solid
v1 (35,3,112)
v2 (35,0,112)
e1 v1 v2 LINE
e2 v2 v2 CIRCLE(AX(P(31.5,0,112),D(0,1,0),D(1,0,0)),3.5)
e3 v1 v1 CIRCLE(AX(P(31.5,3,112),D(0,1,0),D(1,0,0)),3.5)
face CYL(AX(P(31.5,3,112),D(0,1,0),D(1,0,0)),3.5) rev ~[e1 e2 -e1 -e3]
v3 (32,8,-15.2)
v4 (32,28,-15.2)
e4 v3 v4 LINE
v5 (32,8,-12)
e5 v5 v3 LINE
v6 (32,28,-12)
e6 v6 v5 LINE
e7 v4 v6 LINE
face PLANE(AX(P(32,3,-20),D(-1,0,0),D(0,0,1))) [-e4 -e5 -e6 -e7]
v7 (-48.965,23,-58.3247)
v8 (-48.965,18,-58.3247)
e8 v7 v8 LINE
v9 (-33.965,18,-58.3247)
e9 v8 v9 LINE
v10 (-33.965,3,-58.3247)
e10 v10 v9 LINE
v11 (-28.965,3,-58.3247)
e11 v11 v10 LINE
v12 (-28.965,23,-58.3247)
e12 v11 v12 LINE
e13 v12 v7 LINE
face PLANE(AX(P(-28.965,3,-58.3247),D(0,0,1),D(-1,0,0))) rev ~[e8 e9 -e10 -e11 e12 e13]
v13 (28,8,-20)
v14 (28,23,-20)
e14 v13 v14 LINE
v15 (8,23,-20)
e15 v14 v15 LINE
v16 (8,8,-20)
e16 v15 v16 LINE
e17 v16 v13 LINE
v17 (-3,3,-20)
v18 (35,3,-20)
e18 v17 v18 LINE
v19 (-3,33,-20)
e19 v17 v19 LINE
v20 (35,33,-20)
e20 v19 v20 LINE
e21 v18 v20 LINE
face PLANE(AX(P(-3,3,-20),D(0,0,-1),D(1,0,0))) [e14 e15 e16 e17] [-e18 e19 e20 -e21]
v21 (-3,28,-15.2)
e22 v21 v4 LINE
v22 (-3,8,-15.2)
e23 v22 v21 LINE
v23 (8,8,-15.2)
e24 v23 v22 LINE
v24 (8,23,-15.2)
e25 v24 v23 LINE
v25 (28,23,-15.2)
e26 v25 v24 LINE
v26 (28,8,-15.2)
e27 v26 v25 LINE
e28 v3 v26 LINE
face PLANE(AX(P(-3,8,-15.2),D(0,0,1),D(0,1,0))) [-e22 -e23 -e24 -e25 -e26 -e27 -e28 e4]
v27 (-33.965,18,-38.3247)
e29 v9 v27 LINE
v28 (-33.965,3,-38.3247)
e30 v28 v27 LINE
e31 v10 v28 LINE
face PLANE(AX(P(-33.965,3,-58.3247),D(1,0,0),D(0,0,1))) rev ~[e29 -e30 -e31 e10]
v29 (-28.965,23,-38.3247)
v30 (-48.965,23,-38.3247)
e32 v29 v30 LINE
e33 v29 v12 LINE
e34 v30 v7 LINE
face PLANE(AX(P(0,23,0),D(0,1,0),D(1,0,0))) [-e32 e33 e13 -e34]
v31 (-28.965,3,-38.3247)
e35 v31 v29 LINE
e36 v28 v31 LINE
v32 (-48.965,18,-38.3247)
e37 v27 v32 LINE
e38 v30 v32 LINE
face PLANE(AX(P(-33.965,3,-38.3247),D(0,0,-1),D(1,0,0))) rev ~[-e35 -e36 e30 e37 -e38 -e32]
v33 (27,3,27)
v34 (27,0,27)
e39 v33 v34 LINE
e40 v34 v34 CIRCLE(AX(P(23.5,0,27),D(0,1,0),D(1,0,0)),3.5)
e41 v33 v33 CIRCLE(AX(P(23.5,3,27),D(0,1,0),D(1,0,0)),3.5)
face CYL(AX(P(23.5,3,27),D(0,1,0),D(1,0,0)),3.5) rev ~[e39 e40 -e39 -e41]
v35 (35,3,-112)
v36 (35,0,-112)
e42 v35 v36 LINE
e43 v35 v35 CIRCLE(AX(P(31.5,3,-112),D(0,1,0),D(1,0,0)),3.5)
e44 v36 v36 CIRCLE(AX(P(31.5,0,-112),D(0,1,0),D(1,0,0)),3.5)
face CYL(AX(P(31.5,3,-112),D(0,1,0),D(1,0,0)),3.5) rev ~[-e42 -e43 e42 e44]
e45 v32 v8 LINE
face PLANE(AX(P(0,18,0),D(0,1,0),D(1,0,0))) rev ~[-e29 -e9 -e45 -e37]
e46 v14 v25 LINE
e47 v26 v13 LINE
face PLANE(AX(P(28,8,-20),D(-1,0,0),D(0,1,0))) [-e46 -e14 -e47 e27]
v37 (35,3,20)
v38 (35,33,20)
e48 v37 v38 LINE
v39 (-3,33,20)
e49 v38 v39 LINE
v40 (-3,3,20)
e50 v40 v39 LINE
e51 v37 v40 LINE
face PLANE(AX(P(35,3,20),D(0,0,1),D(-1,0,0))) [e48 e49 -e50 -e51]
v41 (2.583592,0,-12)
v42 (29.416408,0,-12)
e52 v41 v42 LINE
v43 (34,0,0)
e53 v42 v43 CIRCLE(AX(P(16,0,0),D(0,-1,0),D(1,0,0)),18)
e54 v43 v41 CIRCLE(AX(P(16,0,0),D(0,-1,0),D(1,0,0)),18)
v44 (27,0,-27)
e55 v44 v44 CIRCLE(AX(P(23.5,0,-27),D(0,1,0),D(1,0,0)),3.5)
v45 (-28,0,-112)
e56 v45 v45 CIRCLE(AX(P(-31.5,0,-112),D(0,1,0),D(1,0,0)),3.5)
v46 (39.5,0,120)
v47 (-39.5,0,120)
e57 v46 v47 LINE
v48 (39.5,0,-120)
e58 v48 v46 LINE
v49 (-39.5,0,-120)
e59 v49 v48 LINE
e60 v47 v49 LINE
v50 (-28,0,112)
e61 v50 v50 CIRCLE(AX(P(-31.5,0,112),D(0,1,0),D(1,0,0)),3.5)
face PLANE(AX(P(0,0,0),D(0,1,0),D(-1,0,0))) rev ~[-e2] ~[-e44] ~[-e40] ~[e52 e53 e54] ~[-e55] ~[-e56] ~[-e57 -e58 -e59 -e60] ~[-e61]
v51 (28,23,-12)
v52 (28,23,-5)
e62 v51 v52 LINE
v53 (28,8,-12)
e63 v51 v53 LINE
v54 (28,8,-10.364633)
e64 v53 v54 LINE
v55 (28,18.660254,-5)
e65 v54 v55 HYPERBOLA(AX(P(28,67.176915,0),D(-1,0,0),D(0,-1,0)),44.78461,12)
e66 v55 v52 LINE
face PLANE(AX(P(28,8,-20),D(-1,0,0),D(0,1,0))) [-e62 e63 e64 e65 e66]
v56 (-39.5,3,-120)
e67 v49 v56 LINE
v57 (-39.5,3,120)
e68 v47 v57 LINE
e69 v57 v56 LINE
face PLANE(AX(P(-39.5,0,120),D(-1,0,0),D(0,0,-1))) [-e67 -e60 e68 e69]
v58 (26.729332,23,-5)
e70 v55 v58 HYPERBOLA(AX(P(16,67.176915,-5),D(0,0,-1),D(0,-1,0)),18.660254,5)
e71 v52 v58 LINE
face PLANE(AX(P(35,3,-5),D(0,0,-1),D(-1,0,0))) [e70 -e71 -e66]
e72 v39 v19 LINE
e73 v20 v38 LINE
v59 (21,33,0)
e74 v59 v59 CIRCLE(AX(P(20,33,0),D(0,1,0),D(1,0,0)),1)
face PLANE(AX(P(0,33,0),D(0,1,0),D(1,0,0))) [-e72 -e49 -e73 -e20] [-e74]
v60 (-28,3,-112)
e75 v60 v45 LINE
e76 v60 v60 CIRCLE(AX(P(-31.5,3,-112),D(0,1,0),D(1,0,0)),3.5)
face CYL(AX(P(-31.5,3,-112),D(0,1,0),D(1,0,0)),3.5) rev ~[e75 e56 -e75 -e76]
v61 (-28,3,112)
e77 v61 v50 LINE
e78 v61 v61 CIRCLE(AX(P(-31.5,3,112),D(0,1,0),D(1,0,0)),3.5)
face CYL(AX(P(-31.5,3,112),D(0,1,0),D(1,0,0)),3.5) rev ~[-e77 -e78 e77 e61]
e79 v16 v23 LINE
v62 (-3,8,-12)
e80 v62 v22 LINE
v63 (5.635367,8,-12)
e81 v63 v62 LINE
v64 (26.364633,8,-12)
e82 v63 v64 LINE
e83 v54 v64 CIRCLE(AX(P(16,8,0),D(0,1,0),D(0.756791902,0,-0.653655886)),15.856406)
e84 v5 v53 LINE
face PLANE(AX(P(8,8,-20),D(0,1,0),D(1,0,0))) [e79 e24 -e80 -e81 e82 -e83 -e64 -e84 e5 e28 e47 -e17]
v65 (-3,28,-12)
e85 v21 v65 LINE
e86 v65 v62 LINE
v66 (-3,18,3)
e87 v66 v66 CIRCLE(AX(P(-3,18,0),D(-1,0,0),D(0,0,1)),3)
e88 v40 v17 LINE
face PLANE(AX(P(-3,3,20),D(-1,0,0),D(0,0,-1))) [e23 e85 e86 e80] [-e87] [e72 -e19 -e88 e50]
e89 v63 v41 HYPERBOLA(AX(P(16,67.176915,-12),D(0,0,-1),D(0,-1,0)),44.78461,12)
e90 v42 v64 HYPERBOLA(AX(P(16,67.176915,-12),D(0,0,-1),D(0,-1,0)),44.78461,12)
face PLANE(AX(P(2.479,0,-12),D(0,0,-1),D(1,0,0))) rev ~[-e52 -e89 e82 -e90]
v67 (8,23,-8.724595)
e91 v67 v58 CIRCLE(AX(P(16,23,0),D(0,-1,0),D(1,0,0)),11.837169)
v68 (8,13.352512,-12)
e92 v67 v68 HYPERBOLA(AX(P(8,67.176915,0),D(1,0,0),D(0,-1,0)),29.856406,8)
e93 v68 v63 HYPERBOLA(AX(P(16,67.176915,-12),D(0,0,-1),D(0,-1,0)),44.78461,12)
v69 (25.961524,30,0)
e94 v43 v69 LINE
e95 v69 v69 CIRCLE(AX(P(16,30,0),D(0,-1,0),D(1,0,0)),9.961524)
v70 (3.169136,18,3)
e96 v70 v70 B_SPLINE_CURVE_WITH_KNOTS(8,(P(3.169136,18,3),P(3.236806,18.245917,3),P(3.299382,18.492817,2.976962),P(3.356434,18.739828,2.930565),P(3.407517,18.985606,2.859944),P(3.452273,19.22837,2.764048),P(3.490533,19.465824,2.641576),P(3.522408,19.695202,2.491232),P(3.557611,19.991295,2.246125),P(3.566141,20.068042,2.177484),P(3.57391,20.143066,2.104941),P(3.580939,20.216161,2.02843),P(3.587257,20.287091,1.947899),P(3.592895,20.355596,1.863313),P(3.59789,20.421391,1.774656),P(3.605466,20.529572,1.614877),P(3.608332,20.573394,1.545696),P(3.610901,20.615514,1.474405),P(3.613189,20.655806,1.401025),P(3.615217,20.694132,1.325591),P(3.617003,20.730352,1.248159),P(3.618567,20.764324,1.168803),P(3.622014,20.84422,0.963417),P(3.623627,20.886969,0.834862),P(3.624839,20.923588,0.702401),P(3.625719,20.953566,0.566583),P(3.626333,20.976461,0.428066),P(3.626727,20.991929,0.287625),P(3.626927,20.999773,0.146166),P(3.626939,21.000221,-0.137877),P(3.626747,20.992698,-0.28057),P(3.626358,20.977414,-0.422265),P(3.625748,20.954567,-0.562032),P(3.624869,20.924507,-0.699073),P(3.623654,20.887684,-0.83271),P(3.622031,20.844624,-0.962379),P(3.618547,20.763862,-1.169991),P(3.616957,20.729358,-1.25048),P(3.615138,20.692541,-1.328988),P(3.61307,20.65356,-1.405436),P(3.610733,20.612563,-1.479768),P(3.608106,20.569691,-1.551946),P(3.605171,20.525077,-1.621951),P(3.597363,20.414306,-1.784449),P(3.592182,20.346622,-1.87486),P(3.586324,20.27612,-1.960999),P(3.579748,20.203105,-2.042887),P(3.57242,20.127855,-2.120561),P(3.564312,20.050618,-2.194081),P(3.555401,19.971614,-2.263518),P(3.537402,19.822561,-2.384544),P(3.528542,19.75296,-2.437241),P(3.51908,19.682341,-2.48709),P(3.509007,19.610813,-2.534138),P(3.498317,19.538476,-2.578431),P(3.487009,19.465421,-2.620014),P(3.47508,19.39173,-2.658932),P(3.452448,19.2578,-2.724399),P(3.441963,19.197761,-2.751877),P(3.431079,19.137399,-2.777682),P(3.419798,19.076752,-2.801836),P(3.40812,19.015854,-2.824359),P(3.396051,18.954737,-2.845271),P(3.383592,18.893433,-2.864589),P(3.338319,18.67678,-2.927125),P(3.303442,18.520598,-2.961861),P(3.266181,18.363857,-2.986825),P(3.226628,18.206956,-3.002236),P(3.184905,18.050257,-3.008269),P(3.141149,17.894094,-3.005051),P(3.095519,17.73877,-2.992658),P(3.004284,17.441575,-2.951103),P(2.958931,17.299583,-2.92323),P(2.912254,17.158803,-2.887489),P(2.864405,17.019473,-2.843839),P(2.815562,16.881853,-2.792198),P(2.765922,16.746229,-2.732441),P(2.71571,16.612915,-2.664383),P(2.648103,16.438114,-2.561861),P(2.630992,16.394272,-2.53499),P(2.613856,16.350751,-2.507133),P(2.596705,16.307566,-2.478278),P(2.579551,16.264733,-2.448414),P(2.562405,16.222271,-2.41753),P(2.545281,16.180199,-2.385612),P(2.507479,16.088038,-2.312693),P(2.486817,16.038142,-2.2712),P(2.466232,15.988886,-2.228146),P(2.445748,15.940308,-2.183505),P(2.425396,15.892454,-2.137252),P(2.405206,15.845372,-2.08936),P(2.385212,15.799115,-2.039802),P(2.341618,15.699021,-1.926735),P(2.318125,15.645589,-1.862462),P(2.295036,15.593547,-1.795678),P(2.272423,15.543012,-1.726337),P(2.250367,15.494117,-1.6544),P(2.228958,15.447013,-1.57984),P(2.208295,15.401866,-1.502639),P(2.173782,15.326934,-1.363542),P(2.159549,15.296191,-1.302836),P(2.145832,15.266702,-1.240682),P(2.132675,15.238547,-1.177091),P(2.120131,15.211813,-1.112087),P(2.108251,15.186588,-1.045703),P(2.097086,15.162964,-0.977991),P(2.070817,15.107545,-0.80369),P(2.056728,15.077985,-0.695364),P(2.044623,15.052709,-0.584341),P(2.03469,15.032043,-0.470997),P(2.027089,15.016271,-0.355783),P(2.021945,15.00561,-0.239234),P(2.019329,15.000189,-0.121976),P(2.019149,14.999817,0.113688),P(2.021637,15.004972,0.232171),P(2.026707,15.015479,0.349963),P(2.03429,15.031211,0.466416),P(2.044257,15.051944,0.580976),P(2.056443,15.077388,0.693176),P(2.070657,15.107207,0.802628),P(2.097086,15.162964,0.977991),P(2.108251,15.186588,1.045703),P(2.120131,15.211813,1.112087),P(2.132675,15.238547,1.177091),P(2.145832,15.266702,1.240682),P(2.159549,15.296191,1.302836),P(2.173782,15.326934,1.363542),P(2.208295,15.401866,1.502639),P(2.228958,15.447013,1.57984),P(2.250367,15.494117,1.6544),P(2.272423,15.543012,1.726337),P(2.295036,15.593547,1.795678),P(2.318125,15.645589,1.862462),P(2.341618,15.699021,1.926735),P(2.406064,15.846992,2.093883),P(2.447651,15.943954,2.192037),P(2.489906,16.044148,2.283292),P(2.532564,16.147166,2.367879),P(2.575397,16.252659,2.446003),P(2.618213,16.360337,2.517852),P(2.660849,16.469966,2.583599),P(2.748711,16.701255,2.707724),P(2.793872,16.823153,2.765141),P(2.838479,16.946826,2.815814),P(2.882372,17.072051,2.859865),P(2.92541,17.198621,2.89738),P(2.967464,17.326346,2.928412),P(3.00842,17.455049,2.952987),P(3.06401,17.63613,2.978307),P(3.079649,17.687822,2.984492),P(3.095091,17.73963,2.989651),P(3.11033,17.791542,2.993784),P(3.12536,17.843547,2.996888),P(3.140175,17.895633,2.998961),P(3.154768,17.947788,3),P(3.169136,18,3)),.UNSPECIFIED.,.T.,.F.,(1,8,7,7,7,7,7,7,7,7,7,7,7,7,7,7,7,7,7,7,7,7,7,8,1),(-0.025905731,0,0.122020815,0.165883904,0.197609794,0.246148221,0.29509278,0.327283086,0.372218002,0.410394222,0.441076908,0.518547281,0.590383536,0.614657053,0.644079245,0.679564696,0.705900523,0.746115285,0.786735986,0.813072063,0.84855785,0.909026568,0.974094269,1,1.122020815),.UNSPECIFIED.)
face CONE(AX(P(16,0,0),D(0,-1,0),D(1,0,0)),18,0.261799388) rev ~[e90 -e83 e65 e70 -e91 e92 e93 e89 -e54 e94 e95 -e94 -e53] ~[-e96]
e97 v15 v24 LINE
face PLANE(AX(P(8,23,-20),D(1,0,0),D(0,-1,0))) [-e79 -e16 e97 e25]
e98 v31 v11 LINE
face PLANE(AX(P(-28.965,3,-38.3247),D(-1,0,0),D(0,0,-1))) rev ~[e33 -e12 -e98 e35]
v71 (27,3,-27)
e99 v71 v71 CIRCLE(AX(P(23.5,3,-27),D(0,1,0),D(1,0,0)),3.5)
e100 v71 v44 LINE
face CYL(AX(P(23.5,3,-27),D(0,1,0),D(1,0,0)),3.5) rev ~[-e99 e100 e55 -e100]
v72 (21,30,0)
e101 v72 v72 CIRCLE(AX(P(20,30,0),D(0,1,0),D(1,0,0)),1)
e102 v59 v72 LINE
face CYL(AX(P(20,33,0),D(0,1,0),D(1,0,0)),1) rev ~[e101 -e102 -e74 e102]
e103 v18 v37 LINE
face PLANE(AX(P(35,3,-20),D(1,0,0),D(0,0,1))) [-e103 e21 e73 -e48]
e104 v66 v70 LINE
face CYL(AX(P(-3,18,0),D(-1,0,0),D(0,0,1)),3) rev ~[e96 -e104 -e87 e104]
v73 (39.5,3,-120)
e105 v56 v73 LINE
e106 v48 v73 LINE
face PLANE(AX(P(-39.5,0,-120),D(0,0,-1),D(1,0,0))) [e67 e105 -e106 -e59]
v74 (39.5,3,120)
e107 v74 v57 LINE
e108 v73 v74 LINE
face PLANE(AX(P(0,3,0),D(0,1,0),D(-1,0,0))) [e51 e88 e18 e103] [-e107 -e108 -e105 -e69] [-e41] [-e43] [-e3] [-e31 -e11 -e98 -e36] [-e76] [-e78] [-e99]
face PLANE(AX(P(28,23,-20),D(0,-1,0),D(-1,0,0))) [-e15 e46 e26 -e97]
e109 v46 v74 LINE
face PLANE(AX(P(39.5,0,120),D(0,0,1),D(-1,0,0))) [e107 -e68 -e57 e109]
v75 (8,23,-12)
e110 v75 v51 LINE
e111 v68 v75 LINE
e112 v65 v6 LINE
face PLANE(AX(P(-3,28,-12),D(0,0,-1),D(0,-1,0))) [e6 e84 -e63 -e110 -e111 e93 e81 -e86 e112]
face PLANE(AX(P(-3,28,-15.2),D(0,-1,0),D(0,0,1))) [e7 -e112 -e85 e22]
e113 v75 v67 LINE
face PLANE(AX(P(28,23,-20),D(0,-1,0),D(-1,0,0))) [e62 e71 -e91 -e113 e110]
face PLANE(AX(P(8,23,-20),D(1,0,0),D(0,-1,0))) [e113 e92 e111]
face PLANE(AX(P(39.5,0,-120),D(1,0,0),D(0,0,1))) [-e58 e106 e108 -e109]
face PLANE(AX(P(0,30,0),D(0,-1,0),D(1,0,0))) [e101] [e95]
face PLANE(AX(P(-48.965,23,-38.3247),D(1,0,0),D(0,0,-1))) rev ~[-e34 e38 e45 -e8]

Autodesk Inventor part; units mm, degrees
ref_plane "YZ Plane" through (0, 0, 0) normal (1, 0, 0) x (0, 1, 0)
ref_plane "XZ Plane" through (0, 0, 0) normal (0, 1, 0) x (-1, 0, 0)
ref_plane "XY Plane" through (0, 0, 0) normal (0, 0, 1) x (1, 0, 0)
sketch "Sketch44" plane through (0, 0, 0) normal (0, 1, 0) x (-1, 0, 0)
  line L0 (-39.5, 120) -> (39.5, 120)
  line L1 (39.5, 120) -> (39.5, -120)
  line L2 (39.5, -120) -> (-39.5, -120)
  line L3 (-39.5, -120) -> (-39.5, 120)
  line L4 (-39.5, 120) -> (39.5, -120) construction
  line L5 (39.5, 120) -> (-39.5, -120) construction
  point P0 (0, 0)
  dimension "d138" = 79
  dimension "d139" = 240
extrude "Extrusion33" add sketch "Sketch44" along normal blind 3
sketch "Sketch45" plane through (0, 3, 0) normal (0, 1, 0) x (1, 0, 0)
  line L0 (35, -20) -> (-3, -20)
  line L1 (-3, -20) -> (-3, 20)
  line L2 (-3, 20) -> (35, 20)
  line L3 (35, 20) -> (35, -20)
  point P0 (0, 0)
  dimension "d142" = 38
  dimension "d143" = 40
extrude "Extrusion34" add sketch "Sketch45" along normal blind 30
sketch "Sketch47" plane through (0, 0, 0) normal (0, -1, 0) x (1, 0, 0)
  circle A0 centre (16, 0) radius 18
  point P0 (0, 0)
  dimension "d146" = 36
extrude "Extrusion35" cut sketch "Sketch47" against normal blind 30 draft -15
sketch "Sketch58" plane through (35, 3, -20) normal (0, 0, -1) x (-1, 0, 0)
  line L0 (7, 20) -> (27, 20)
  line L1 (27, 20) -> (27, 5)
  line L2 (27, 5) -> (7, 5)
  line L3 (7, 5) -> (7, 20)
  point P0 (35, -3)
  dimension "d156" = 20
  dimension "d157" = 15
extrude "Extrusion38" cut sketch "Sketch58" against normal blind 15
sketch "Sketch59" plane through (-3, 3, -20) normal (-1, 0, 0) x (0, 0, 1)
  line L0 (4.8, 25) -> (8, 25)
  line L1 (8, 25) -> (8, 5)
  line L2 (8, 5) -> (4.8, 5)
  line L3 (4.8, 5) -> (4.8, 25)
  point P0 (20, -3)
  dimension "d160" = 3.2
  dimension "d161" = 20
extrude "Extrusion39" cut sketch "Sketch59" against normal blind 35
sketch "Sketch60" plane through (0, 3, 0) normal (0, 1, 0) x (1, 0, 0)
  line L0 (-33.965, 38.3247) -> (-28.965, 38.3247)
  line L1 (-28.965, 38.3247) -> (-28.965, 58.3247)
  line L2 (-28.965, 58.3247) -> (-33.965, 58.3247)
  line L3 (-33.965, 58.3247) -> (-33.965, 38.3247)
  point P0 (0, 0)
  dimension "d164" = 5
  dimension "d165" = 20
extrude "Extrusion40" add sketch "Sketch60" along normal blind 20
sketch "Sketch61" plane through (0, 23, 0) normal (0, 1, 0) x (1, 0, 0)
  line L0 (-28.965, 38.3247) -> (-28.965, 58.3247) projected
  line L1 (-28.965, 38.3247) -> (-48.965, 38.3247)
  line L2 (-48.965, 38.3247) -> (-48.965, 58.3247)
  line L3 (-48.965, 58.3247) -> (-28.965, 58.3247)
  line L4 (-28.965, 58.3247) -> (-28.965, 38.3247)
  point P0 (0, 0)
  dimension "d168" = 20
  dimension "d169" = 20
extrude "Extrusion41" add sketch "Sketch61" against normal blind 5
sketch "Sketch64" plane through (0, 33, 0) normal (0, 1, 0) x (1, 0, 0)
  circle A0 centre (20, 0) radius 1
  point P0 (0, 0)
  dimension "d173" = 2
extrude "Extrusion42" cut sketch "Sketch64" against normal through all
sketch "Sketch65" plane through (-3, 3, -20) normal (-1, 0, 0) x (0, 0, 1)
  circle A0 centre (20, 15) radius 3
  point P0 (20, -3)
  dimension "d176" = 6
extrude "Extrusion43" cut sketch "Sketch65" against normal blind 10
sketch "Sketch68" plane through (0, 3, 0) normal (0, 1, 0) x (1, 0, 0)
  circle A0 centre (-31.5, -112) radius 3.5
  circle A1 centre (31.5, -112) radius 3.5
  circle A2 centre (-31.5, 112) radius 3.5
  circle A3 centre (31.5, 112) radius 3.5
  point P0 (0, 0)
  dimension "d192" = 7
  dimension "d193" = 7
  dimension "d194" = 7
  dimension "d195" = 7
extrude "Extrusion46" cut sketch "Sketch68" against normal through all
sketch "Sketch69" plane through (0, 3, 0) normal (0, 1, 0) x (1, 0, 0)
  circle A0 centre (23.5, -27) radius 3.5
  circle A1 centre (23.5, 27) radius 3.5
  point P0 (0, 0)
  dimension "d198" = 7
  dimension "d199" = 7
extrude "Extrusion47" cut sketch "Sketch69" against normal through all
sketch "Sketch70" plane through (0, 0, 0) normal (0, -1, 0) x (1, 0, 0)
  line L0 (-3, -12) -> (32, -12) projected
  line L1 (2.479, -12) -> (29.6644, -12)
  line L2 (29.6644, -12) -> (29.6644, -18.105)
  line L3 (29.6644, -18.105) -> (2.479, -18.105)
  line L4 (2.479, -18.105) -> (2.479, -12)
  point P0 (0, 0)
extrude "Extrusion48" add sketch "Sketch70" against normal blind 8
equation "\"d193\" = d192"
equation "\"d194\" = d192"
equation "\"d195\" = d192"
equation "\"d198\" = d192"
equation "\"d199\" = d192"
properties part number "liquid port_v08"
